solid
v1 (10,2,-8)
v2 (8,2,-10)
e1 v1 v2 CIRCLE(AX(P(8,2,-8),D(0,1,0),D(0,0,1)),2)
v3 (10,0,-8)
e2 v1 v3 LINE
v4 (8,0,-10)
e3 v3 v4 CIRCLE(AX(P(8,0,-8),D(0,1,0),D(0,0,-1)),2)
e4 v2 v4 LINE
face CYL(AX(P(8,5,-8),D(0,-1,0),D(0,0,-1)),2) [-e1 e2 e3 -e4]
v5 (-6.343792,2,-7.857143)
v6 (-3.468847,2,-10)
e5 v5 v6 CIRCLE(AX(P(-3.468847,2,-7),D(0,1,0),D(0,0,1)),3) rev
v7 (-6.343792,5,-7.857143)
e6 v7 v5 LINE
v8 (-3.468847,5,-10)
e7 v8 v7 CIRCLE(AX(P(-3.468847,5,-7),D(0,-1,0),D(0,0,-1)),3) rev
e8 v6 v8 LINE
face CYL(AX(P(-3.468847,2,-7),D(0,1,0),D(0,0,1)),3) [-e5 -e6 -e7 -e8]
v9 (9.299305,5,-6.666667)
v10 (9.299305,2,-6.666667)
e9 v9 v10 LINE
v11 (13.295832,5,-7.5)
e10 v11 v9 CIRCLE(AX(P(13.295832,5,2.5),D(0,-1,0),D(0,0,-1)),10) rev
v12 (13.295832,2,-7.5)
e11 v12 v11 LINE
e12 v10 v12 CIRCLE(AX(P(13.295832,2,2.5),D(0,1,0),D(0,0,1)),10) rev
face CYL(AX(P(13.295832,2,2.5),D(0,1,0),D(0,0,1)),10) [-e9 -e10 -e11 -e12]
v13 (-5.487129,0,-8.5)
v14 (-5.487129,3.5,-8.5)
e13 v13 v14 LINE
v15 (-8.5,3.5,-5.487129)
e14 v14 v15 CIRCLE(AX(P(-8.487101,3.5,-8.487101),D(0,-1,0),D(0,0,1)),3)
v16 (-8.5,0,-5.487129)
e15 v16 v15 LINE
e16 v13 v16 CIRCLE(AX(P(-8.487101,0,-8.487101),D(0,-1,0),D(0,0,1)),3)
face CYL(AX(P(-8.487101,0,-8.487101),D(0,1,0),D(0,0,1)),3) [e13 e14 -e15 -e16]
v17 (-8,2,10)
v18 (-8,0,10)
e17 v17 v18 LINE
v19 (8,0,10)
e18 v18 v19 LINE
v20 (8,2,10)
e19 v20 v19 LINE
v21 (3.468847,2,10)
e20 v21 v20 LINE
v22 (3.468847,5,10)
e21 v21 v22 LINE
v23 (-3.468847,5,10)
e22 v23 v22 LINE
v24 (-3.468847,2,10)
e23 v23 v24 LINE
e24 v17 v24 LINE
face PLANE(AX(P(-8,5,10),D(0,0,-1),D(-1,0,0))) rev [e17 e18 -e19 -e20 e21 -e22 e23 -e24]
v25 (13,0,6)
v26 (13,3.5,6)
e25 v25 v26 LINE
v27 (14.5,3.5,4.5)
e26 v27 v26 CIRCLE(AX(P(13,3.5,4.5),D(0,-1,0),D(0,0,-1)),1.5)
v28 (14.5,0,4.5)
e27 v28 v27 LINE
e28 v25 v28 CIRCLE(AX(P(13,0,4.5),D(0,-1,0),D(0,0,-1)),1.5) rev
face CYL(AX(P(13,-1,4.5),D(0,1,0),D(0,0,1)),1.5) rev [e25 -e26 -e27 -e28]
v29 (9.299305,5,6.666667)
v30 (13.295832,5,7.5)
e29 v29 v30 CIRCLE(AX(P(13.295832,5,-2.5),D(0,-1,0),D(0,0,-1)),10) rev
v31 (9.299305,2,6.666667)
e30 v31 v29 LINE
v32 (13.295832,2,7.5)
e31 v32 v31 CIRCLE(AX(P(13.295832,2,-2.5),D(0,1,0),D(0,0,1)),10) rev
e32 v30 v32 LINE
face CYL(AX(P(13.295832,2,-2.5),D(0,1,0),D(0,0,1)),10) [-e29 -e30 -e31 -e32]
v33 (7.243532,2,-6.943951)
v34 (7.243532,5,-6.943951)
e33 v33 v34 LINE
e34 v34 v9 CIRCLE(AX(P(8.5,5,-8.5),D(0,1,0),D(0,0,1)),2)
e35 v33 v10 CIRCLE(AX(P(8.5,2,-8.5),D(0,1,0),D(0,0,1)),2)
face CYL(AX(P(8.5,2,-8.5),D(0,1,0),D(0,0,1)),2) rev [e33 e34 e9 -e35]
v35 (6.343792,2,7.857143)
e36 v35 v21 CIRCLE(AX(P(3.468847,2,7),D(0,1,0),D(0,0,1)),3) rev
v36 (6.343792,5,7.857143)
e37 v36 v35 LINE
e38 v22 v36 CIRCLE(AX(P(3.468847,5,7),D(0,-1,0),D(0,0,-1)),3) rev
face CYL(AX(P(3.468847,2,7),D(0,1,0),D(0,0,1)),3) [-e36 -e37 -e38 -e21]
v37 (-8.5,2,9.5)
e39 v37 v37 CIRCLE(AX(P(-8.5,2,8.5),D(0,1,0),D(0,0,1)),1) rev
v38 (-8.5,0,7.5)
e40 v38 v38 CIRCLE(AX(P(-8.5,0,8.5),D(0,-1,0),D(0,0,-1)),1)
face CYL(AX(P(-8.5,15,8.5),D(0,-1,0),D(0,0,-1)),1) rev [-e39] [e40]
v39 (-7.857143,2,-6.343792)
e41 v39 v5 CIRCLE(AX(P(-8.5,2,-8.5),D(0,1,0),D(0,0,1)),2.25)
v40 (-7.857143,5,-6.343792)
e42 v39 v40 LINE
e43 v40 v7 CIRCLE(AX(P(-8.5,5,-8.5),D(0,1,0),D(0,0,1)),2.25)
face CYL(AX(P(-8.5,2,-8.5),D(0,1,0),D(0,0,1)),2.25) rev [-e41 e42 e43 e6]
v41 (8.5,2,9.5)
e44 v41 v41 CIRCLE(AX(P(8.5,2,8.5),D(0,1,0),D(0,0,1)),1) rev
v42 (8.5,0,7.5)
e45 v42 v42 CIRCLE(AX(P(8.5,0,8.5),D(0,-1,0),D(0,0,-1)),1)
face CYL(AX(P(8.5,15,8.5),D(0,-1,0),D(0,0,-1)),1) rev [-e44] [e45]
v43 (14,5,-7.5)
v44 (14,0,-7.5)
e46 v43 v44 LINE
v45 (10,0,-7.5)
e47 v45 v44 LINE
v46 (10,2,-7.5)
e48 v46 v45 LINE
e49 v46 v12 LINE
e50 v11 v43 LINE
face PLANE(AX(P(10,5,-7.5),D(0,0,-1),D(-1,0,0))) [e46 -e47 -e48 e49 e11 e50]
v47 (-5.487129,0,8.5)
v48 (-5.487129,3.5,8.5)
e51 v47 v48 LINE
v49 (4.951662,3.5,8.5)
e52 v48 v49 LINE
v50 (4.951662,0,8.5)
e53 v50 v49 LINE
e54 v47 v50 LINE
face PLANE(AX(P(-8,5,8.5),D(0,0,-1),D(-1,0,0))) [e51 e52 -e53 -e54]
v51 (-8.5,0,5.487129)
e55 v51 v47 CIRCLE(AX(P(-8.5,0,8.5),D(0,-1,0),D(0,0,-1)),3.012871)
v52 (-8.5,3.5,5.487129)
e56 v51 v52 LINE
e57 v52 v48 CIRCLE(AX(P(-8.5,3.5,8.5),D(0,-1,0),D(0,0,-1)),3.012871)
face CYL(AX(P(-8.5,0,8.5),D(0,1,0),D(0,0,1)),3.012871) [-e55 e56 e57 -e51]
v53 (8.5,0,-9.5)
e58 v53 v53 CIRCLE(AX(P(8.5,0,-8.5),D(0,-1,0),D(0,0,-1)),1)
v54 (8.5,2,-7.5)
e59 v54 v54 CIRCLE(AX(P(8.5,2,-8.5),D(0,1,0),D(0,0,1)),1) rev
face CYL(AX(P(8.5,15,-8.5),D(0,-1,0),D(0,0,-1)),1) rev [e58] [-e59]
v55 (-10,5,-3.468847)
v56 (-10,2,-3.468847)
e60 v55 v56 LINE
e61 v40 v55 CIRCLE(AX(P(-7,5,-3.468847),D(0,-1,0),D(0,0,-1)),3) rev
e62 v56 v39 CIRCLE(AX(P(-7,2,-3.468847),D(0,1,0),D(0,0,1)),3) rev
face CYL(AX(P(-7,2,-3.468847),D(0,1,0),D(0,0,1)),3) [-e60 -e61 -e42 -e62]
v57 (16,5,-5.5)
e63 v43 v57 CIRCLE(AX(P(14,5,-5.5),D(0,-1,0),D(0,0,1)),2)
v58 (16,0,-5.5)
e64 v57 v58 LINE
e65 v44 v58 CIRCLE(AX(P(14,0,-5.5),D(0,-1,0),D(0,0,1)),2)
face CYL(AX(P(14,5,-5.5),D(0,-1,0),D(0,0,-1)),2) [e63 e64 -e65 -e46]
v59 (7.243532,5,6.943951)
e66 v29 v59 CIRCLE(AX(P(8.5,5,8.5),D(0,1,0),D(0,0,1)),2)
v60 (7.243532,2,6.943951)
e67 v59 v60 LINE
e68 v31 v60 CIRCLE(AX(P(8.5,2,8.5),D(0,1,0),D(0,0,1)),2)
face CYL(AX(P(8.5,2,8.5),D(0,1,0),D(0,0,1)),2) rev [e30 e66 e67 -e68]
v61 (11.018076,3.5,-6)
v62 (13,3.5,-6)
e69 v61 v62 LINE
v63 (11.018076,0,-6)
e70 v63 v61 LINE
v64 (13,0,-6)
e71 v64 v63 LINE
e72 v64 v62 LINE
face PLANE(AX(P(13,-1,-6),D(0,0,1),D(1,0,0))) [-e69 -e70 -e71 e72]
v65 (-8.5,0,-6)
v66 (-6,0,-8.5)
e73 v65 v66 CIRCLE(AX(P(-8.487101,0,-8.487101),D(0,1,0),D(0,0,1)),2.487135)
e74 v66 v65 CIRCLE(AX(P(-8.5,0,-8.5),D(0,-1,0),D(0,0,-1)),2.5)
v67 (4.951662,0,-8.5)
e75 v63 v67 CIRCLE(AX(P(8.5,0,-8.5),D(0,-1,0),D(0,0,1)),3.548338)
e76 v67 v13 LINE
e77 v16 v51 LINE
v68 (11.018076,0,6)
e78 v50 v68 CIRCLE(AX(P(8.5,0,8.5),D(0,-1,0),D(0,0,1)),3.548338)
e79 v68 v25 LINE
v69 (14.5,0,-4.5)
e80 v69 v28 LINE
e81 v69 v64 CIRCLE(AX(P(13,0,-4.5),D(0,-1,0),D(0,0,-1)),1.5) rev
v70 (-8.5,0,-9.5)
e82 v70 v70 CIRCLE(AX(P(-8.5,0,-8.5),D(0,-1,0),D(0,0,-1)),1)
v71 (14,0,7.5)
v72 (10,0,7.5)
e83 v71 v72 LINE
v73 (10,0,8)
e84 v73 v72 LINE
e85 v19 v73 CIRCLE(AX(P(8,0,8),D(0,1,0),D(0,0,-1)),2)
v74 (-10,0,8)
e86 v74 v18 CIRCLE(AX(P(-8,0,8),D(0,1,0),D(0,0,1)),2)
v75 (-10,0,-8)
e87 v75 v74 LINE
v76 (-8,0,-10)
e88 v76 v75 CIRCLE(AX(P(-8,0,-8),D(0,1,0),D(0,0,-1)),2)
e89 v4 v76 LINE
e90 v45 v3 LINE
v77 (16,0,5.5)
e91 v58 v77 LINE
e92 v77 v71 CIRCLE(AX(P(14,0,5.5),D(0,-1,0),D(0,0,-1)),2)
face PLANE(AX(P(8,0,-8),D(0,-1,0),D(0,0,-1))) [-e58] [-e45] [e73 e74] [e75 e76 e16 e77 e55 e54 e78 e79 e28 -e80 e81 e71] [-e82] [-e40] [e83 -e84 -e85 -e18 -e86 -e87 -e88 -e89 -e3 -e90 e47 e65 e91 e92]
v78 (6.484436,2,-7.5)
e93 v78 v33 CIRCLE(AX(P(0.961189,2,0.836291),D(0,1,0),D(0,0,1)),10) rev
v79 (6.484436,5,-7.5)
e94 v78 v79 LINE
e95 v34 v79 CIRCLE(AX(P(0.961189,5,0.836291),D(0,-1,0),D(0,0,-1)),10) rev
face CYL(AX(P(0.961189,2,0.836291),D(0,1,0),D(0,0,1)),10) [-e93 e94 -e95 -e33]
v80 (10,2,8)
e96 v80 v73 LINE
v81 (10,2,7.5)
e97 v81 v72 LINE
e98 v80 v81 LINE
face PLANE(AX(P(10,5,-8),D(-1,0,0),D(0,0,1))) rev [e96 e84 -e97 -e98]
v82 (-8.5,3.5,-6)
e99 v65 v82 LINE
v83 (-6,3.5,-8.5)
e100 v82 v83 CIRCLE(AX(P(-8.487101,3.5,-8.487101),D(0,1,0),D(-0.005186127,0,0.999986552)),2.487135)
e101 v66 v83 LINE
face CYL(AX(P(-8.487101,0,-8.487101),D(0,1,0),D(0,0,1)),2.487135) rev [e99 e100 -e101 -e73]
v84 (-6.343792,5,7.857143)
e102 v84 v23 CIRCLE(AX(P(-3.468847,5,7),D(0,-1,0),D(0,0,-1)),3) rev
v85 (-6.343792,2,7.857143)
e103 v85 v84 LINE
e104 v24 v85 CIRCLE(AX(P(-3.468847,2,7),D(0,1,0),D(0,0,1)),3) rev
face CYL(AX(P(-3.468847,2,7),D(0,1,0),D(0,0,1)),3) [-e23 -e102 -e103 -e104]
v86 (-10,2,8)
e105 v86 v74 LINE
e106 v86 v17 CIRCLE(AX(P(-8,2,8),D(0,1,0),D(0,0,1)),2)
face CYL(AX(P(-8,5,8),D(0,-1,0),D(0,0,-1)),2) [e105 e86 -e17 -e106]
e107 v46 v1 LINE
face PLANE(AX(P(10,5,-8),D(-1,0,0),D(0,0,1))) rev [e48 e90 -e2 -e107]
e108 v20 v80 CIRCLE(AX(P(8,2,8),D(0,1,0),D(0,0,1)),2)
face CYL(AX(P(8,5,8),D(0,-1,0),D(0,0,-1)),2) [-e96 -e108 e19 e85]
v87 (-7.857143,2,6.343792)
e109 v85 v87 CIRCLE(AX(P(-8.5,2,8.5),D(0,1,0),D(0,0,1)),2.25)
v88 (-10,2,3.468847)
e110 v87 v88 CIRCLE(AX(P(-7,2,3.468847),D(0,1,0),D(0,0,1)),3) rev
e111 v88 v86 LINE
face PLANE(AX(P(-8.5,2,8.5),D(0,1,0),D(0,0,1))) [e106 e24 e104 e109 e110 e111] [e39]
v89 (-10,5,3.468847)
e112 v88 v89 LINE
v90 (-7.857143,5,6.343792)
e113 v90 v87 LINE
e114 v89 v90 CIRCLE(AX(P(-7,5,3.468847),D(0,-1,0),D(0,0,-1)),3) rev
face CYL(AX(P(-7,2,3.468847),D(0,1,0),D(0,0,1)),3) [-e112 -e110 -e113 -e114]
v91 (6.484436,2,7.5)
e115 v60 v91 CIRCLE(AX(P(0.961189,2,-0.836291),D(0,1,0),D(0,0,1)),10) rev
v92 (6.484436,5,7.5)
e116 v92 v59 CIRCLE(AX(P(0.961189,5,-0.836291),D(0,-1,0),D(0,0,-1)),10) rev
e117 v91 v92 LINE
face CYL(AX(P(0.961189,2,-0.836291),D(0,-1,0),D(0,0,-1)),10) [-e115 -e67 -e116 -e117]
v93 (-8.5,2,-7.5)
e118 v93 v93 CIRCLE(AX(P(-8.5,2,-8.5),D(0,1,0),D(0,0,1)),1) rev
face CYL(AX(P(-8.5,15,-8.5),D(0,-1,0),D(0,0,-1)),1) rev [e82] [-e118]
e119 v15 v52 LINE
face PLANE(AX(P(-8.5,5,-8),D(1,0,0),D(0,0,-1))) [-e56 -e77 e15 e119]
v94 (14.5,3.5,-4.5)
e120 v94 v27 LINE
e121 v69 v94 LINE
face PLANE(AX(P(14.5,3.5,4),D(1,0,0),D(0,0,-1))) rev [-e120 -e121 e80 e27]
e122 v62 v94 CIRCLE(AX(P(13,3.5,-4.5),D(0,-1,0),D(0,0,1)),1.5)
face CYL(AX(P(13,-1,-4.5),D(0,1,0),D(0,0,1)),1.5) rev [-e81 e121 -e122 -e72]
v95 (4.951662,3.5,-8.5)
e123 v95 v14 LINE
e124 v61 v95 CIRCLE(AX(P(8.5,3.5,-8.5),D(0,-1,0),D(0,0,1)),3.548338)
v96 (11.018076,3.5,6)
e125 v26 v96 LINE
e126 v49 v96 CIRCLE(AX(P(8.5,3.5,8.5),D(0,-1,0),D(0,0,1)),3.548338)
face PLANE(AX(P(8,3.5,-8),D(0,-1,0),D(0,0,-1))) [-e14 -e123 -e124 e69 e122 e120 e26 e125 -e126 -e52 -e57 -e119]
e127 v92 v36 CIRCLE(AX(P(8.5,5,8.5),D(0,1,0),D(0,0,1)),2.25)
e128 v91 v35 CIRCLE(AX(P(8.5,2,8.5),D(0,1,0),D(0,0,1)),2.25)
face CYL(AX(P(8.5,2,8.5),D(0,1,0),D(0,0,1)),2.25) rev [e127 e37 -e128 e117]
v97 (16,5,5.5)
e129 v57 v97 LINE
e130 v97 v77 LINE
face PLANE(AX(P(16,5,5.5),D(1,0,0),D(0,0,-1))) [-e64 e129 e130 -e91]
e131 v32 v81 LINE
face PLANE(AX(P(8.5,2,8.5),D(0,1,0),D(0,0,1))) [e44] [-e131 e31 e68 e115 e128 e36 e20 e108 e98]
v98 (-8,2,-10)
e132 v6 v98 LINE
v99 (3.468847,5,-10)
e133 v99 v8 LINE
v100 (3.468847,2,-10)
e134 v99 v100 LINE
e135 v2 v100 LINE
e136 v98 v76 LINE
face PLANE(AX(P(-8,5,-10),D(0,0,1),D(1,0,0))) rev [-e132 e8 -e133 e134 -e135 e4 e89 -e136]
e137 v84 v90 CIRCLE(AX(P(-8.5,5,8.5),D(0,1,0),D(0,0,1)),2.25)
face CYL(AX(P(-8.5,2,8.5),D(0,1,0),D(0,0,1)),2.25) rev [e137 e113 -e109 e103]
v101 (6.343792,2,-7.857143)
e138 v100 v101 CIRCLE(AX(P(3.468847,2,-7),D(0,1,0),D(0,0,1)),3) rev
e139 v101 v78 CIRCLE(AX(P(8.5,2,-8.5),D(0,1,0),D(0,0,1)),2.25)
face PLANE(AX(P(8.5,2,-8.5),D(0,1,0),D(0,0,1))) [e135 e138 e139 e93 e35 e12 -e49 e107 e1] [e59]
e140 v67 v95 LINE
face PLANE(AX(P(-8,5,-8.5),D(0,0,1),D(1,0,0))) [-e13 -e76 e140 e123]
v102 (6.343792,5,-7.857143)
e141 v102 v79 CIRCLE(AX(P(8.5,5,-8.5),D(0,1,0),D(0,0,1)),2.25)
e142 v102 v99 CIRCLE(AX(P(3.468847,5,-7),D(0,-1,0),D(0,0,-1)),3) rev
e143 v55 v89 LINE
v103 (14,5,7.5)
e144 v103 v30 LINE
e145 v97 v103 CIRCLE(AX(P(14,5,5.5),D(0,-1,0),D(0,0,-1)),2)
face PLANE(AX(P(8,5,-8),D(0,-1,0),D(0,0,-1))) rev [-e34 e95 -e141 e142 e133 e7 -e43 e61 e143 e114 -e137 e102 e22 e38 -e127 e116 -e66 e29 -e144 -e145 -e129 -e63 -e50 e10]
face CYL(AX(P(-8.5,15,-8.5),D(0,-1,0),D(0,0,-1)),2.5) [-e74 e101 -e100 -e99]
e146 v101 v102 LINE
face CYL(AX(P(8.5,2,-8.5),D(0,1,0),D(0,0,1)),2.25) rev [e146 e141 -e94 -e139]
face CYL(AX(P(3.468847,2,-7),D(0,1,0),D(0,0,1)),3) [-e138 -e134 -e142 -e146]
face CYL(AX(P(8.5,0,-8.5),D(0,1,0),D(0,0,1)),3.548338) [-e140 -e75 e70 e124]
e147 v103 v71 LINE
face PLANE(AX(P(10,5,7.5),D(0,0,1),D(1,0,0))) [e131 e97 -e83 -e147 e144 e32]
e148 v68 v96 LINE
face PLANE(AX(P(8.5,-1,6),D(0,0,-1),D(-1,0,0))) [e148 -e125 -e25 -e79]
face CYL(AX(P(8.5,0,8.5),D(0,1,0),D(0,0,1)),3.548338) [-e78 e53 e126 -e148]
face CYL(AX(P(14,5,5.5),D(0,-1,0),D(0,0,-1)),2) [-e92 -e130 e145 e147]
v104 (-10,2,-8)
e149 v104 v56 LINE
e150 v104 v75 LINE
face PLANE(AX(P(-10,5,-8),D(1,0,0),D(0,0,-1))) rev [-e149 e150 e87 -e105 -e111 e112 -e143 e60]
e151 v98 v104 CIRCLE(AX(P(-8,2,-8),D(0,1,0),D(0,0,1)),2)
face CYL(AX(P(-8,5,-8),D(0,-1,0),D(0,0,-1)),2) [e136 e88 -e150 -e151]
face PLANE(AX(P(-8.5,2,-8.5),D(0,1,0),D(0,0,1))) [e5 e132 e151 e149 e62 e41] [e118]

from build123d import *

# Parameters (mm, degrees)
BOSS_EXTRUDE1_DEPTH     = 5
SKETCH2_R               = 1
CUT_EXTRUDE1_DEPTH      = 15
SHELL1_DEPTH            = 3.5
SKETCH4_R               = 2.25
CUT_EXTRUDE2_DEPTH      = 3
FILLET2_R               = 3
BOSS_EXTRUDE2_DEPTH     = 5
CUT_EXTRUDE3_DEPTH      = 3.5
SKETCH8_W               = 3.515564437
SKETCH8_H               = 15
BOSS_EXTRUDE3_DEPTH     = 3
SKETCH9_R               = 2
CUT_EXTRUDE5_DEPTH      = 3
FILLET3_R               = 10
CUT_EXTRUDE7_DEPTH      = 3
CUT_EXTRUDE7_DEPTH_BACK = 1.5
BOSS_EXTRUDE4_START     = 3.5
BOSS_EXTRUDE4_DEPTH     = 3.5


with BuildPart() as part:
    # Sketch1 → Boss-Extrude1 (new body)
    with BuildSketch(Plane(origin=(0, 0, 0), x_dir=(1, 0, 0), z_dir=(0, 1, 0))):
        with BuildLine():
            Line((-8, 10), (8, 10))
            ThreePointArc((8, 10), (9.414213562, 9.414213562), (10, 8))
            Line((10, 8), (10, -8))
            ThreePointArc((10, -8), (9.414213562, -9.414213562), (8, -10))
            Line((8, -10), (-8, -10))
            ThreePointArc((-8, -10), (-9.414213562, -9.414213562), (-10, -8))
            Line((-10, -8), (-10, 8))
            ThreePointArc((-10, 8), (-9.414213562, 9.414213562), (-8, 10))
        make_face()
    extrude(amount=BOSS_EXTRUDE1_DEPTH)

    # Sketch2 → Cut-Extrude1 (cut)
    with BuildSketch(Plane.XZ):
        with Locations(Location((-8.5, 8.5, 0), (0, 0, 270))):
            Circle(SKETCH2_R)
        with Locations(Location((8.5, 8.5, 0), (0, 0, 270))):
            Circle(SKETCH2_R)
        with Locations(Location((8.5, -8.5, 0), (0, 0, 270))):
            Circle(SKETCH2_R)
        with Locations(Location((-8.5, -8.5, 0), (0, 0, 270))):
            Circle(SKETCH2_R)
    extrude(amount=-CUT_EXTRUDE1_DEPTH, mode=Mode.SUBTRACT)

    # Shell1: read off the stored shape, not the designer's step
    # Shell1 outline → Shell1 (cut)
    with BuildSketch(Plane(origin=(0, 0, 0), x_dir=(1, 0, 0), z_dir=(0, 1, 0))):
        with BuildLine():
            Line((6, 8.5), (-6, 8.5))
            ThreePointArc((-6, 8.5), (-6.732233047, 6.732233047), (-8.5, 6))
            Line((-8.5, 6), (-8.5, -6))
            ThreePointArc((-8.5, -6), (-6.732233047, -6.732233047), (-6, -8.5))
            Line((-6, -8.5), (6, -8.5))
            ThreePointArc((6, -8.5), (6.732233047, -6.732233047), (8.5, -6))
            Line((8.5, -6), (8.5, 6))
            ThreePointArc((8.5, 6), (6.732233047, 6.732233047), (6, 8.5))
        make_face()
    extrude(amount=SHELL1_DEPTH, mode=Mode.SUBTRACT)

    # Sketch4 → Cut-Extrude2 (cut)
    with BuildSketch(Plane(origin=(0, 5, 0), x_dir=(1, 0, 0), z_dir=(0, 1, 0))):
        with Locations((8.5, -8.5)):
            Circle(SKETCH4_R)
        with Locations((-8.5, -8.5)):
            Circle(SKETCH4_R)
        with Locations((-8.5, 8.5)):
            Circle(SKETCH4_R)
        with Locations((8.5, 8.5)):
            Circle(SKETCH4_R)
    extrude(amount=-CUT_EXTRUDE2_DEPTH, mode=Mode.SUBTRACT)

    # Fillet2
    fillet2_edges = [part.edges().sort_by_distance(p)[0] for p in [
        (6.822949017, 3.5, -10),
        (10, 3.5, -6.822949017),
        (-6.822949017, 3.5, -10),
        (-10, 3.5, -6.822949017),
        (-10, 3.5, 6.822949017),
        (-6.822949017, 3.5, 10),
        (6.822949017, 3.5, 10),
        (10, 3.5, 6.822949017),
    ]]
    fillet(fillet2_edges, radius=FILLET2_R)

    # Sketch5 → Boss-Extrude2 (add)
    with BuildSketch(Plane.XZ):
        with BuildLine():
            Line((10, 7.5), (14, 7.5))
            ThreePointArc((14, 7.5), (15.414213562, 6.914213562), (16, 5.5))
            Line((16, 5.5), (16, -5.5))
            ThreePointArc((16, -5.5), (15.414213562, -6.914213562), (14, -7.5))
            Line((14, -7.5), (10, -7.5))
            Line((10, -7.5), (10, 7.5))
        make_face()
    extrude(amount=-BOSS_EXTRUDE2_DEPTH)

    # Sketch6 → Cut-Extrude3 (cut)
    with BuildSketch(Plane.XZ):
        with BuildLine():
            Line((8.5, 5.5), (13, 5.5))
            ThreePointArc((13, 5.5), (14.060660172, 5.060660172), (14.5, 4))
            Line((14.5, 4), (14.5, -4))
            ThreePointArc((14.5, -4), (14.060660172, -5.060660172), (13, -5.5))
            Line((13, -5.5), (8.5, -5.5))
            Line((8.5, -5.5), (8.5, 5.5))
        make_face()
    extrude(amount=-CUT_EXTRUDE3_DEPTH, mode=Mode.SUBTRACT)

    # Sketch8 → Boss-Extrude3 (add)
    with BuildSketch(Plane(origin=(0, 5, 0), x_dir=(1, 0, 0), z_dir=(0, 1, 0))):
        with Locations((8.242217782, 0)):
            Rectangle(SKETCH8_W, SKETCH8_H)
    extrude(amount=-BOSS_EXTRUDE3_DEPTH)

    # Sketch9 → Cut-Extrude5 (cut)
    with BuildSketch(Plane(origin=(0, 5, 0), x_dir=(1, 0, 0), z_dir=(0, 1, 0))):
        with Locations((8.5, 8.5)):
            Circle(SKETCH9_R)
        with Locations((8.5, -8.5)):
            Circle(SKETCH9_R)
    extrude(amount=-CUT_EXTRUDE5_DEPTH, mode=Mode.SUBTRACT)

    # Fillet3
    # the kernel refuses this fillet: 10 mm, written as the material it takes off along each edge
    with BuildSketch(Plane(origin=(10.232050808, 2, -7.5), x_dir=(1, 0, 0), z_dir=(0, 1, 0))) as fillet3_piece_1:
        with BuildLine():
            CenterArc((3.063780716, -10), FILLET3_R, 90, 23.556464309)
            ThreePointArc((-0.932745554, -0.833333333), (-0.399552407, -0.491458351), (0, 0))
            Line((0, 0), (3.063780716, 0))
        make_face()
    extrude(amount=10.659451789, mode=Mode.SUBTRACT)
    with BuildSketch(Plane(origin=(6.767949192, 2, -7.5), x_dir=(0.649978972407837, 0, 0.759952192856664), z_dir=(0, 1, 0))) as fillet3_piece_2:
        with BuildLine():
            CenterArc((2.560910878, -9.831273909), FILLET3_R, 100.540016502, 5.393327967)
            Line((-0.184277898, -0.215456804), (0, 0))
            ThreePointArc((0, 0), (0.365844411, -0.033745218), (0.731688822, 0))
        make_face()
    extrude(amount=4.829222056, mode=Mode.SUBTRACT)
    with BuildSketch(Plane(origin=(10.232050808, 2, 7.5), x_dir=(-0.7457291752746819, 0, -0.6662492004829293), z_dir=(0, 1, 0))) as fillet3_piece_3:
        with BuildLine():
            CenterArc((4.377741338, -9.498533205), FILLET3_R, 108.221767845, 23.556464309)
            Line((-2.284750666, -2.041241452), (0, 0))
            ThreePointArc((0, 0), (0.62539162, -0.100293359), (1.25078324, 0))
        make_face()
    extrude(amount=10.659451789, mode=Mode.SUBTRACT)
    with BuildSketch(Plane(origin=(6.767949192, 2, 7.5), x_dir=(-1.0, 0, -2.3874717233974133e-11), z_dir=(0, 1, 0))) as fillet3_piece_4:
        with BuildLine():
            CenterArc((5.806759945, -8.33629115), FILLET3_R, 123.52663903, 5.393327967)
            ThreePointArc((-0.475582349, -0.556048525), (-0.212146422, -0.299957945), (0, 0))
            Line((0, 0), (0.28351363, 0))
        make_face()
    extrude(amount=4.829222056, mode=Mode.SUBTRACT)

    # Sketch10 → Cut-Extrude7 (cut, two sides: drawn at the far end of the back side and taken through both)
    with BuildSketch(Plane.XZ.offset(-2).offset(-CUT_EXTRUDE7_DEPTH_BACK)):
        with BuildLine():
            Line((8.5, 6), (13, 6))
            ThreePointArc((13, 6), (14.060660172, 5.560660172), (14.5, 4.5))
            Line((14.5, 4.5), (14.5, -4.5))
            ThreePointArc((14.5, -4.5), (14.060660172, -5.560660172), (13, -6))
            Line((13, -6), (8.5, -6))
            ThreePointArc((8.5, -6), (7.370298682, -6.269803835), (6.484435563, -7.020980054))
            Line((6.484435563, -7.020980054), (6.484435563, 7.020980054))
            ThreePointArc((6.484435563, 7.020980054), (7.392428114, 6.313490581), (8.5, 6))
        make_face()
    extrude(amount=CUT_EXTRUDE7_DEPTH + CUT_EXTRUDE7_DEPTH_BACK, mode=Mode.SUBTRACT)

    # Sketch11 → Boss-Extrude4 (add)
    with BuildSketch(Plane.XZ.offset(-3.5).offset(BOSS_EXTRUDE4_START)):
        with BuildLine():
            Line((4.951661673, -8.5), (6, -8.5))
            ThreePointArc((6, -8.5), (6.732233047, -6.732233047), (8.5, -6))
            Line((8.5, -6), (11.018075631, -6))
            ThreePointArc((11.018075631, -6), (7.148016159, -5.219322543), (4.951661673, -8.5))
        make_face()
        with BuildLine():
            Line((11.018075631, 6), (8.5, 6))
            ThreePointArc((8.5, 6), (6.798059889, 6.798059889), (6, 8.5))
            Line((6, 8.5), (4.951661673, 8.5))
            ThreePointArc((4.951661673, 8.5), (7.148016159, 5.219322543), (11.018075631, 6))
        make_face()
        with BuildLine():
            Line((-6, 8.5), (-5.487129131, 8.5))
            ThreePointArc((-5.487129131, 8.5), (-6.369578578, 6.369578578), (-8.5, 5.487129131))
            Line((-8.5, 5.487129131), (-8.5, 6))
            ThreePointArc((-8.5, 6), (-6.732233047, 6.732233047), (-6, 8.5))
        make_face()
        with BuildLine():
            Line((-8.5, -6), (-8.5, -5.487129131))
            ThreePointArc((-8.5, -5.487129131), (-6.365781058, -6.365781058), (-5.487129131, -8.5))
            Line((-5.487129131, -8.5), (-5.689784623, -8.747525568))
            Line((-5.689784623, -8.747525568), (-6, -8.5))
            ThreePointArc((-6, -8.5), (-6.728431484, -6.728431484), (-8.5, -6))
        make_face()
    extrude(amount=-BOSS_EXTRUDE4_DEPTH)


solid = part.part
